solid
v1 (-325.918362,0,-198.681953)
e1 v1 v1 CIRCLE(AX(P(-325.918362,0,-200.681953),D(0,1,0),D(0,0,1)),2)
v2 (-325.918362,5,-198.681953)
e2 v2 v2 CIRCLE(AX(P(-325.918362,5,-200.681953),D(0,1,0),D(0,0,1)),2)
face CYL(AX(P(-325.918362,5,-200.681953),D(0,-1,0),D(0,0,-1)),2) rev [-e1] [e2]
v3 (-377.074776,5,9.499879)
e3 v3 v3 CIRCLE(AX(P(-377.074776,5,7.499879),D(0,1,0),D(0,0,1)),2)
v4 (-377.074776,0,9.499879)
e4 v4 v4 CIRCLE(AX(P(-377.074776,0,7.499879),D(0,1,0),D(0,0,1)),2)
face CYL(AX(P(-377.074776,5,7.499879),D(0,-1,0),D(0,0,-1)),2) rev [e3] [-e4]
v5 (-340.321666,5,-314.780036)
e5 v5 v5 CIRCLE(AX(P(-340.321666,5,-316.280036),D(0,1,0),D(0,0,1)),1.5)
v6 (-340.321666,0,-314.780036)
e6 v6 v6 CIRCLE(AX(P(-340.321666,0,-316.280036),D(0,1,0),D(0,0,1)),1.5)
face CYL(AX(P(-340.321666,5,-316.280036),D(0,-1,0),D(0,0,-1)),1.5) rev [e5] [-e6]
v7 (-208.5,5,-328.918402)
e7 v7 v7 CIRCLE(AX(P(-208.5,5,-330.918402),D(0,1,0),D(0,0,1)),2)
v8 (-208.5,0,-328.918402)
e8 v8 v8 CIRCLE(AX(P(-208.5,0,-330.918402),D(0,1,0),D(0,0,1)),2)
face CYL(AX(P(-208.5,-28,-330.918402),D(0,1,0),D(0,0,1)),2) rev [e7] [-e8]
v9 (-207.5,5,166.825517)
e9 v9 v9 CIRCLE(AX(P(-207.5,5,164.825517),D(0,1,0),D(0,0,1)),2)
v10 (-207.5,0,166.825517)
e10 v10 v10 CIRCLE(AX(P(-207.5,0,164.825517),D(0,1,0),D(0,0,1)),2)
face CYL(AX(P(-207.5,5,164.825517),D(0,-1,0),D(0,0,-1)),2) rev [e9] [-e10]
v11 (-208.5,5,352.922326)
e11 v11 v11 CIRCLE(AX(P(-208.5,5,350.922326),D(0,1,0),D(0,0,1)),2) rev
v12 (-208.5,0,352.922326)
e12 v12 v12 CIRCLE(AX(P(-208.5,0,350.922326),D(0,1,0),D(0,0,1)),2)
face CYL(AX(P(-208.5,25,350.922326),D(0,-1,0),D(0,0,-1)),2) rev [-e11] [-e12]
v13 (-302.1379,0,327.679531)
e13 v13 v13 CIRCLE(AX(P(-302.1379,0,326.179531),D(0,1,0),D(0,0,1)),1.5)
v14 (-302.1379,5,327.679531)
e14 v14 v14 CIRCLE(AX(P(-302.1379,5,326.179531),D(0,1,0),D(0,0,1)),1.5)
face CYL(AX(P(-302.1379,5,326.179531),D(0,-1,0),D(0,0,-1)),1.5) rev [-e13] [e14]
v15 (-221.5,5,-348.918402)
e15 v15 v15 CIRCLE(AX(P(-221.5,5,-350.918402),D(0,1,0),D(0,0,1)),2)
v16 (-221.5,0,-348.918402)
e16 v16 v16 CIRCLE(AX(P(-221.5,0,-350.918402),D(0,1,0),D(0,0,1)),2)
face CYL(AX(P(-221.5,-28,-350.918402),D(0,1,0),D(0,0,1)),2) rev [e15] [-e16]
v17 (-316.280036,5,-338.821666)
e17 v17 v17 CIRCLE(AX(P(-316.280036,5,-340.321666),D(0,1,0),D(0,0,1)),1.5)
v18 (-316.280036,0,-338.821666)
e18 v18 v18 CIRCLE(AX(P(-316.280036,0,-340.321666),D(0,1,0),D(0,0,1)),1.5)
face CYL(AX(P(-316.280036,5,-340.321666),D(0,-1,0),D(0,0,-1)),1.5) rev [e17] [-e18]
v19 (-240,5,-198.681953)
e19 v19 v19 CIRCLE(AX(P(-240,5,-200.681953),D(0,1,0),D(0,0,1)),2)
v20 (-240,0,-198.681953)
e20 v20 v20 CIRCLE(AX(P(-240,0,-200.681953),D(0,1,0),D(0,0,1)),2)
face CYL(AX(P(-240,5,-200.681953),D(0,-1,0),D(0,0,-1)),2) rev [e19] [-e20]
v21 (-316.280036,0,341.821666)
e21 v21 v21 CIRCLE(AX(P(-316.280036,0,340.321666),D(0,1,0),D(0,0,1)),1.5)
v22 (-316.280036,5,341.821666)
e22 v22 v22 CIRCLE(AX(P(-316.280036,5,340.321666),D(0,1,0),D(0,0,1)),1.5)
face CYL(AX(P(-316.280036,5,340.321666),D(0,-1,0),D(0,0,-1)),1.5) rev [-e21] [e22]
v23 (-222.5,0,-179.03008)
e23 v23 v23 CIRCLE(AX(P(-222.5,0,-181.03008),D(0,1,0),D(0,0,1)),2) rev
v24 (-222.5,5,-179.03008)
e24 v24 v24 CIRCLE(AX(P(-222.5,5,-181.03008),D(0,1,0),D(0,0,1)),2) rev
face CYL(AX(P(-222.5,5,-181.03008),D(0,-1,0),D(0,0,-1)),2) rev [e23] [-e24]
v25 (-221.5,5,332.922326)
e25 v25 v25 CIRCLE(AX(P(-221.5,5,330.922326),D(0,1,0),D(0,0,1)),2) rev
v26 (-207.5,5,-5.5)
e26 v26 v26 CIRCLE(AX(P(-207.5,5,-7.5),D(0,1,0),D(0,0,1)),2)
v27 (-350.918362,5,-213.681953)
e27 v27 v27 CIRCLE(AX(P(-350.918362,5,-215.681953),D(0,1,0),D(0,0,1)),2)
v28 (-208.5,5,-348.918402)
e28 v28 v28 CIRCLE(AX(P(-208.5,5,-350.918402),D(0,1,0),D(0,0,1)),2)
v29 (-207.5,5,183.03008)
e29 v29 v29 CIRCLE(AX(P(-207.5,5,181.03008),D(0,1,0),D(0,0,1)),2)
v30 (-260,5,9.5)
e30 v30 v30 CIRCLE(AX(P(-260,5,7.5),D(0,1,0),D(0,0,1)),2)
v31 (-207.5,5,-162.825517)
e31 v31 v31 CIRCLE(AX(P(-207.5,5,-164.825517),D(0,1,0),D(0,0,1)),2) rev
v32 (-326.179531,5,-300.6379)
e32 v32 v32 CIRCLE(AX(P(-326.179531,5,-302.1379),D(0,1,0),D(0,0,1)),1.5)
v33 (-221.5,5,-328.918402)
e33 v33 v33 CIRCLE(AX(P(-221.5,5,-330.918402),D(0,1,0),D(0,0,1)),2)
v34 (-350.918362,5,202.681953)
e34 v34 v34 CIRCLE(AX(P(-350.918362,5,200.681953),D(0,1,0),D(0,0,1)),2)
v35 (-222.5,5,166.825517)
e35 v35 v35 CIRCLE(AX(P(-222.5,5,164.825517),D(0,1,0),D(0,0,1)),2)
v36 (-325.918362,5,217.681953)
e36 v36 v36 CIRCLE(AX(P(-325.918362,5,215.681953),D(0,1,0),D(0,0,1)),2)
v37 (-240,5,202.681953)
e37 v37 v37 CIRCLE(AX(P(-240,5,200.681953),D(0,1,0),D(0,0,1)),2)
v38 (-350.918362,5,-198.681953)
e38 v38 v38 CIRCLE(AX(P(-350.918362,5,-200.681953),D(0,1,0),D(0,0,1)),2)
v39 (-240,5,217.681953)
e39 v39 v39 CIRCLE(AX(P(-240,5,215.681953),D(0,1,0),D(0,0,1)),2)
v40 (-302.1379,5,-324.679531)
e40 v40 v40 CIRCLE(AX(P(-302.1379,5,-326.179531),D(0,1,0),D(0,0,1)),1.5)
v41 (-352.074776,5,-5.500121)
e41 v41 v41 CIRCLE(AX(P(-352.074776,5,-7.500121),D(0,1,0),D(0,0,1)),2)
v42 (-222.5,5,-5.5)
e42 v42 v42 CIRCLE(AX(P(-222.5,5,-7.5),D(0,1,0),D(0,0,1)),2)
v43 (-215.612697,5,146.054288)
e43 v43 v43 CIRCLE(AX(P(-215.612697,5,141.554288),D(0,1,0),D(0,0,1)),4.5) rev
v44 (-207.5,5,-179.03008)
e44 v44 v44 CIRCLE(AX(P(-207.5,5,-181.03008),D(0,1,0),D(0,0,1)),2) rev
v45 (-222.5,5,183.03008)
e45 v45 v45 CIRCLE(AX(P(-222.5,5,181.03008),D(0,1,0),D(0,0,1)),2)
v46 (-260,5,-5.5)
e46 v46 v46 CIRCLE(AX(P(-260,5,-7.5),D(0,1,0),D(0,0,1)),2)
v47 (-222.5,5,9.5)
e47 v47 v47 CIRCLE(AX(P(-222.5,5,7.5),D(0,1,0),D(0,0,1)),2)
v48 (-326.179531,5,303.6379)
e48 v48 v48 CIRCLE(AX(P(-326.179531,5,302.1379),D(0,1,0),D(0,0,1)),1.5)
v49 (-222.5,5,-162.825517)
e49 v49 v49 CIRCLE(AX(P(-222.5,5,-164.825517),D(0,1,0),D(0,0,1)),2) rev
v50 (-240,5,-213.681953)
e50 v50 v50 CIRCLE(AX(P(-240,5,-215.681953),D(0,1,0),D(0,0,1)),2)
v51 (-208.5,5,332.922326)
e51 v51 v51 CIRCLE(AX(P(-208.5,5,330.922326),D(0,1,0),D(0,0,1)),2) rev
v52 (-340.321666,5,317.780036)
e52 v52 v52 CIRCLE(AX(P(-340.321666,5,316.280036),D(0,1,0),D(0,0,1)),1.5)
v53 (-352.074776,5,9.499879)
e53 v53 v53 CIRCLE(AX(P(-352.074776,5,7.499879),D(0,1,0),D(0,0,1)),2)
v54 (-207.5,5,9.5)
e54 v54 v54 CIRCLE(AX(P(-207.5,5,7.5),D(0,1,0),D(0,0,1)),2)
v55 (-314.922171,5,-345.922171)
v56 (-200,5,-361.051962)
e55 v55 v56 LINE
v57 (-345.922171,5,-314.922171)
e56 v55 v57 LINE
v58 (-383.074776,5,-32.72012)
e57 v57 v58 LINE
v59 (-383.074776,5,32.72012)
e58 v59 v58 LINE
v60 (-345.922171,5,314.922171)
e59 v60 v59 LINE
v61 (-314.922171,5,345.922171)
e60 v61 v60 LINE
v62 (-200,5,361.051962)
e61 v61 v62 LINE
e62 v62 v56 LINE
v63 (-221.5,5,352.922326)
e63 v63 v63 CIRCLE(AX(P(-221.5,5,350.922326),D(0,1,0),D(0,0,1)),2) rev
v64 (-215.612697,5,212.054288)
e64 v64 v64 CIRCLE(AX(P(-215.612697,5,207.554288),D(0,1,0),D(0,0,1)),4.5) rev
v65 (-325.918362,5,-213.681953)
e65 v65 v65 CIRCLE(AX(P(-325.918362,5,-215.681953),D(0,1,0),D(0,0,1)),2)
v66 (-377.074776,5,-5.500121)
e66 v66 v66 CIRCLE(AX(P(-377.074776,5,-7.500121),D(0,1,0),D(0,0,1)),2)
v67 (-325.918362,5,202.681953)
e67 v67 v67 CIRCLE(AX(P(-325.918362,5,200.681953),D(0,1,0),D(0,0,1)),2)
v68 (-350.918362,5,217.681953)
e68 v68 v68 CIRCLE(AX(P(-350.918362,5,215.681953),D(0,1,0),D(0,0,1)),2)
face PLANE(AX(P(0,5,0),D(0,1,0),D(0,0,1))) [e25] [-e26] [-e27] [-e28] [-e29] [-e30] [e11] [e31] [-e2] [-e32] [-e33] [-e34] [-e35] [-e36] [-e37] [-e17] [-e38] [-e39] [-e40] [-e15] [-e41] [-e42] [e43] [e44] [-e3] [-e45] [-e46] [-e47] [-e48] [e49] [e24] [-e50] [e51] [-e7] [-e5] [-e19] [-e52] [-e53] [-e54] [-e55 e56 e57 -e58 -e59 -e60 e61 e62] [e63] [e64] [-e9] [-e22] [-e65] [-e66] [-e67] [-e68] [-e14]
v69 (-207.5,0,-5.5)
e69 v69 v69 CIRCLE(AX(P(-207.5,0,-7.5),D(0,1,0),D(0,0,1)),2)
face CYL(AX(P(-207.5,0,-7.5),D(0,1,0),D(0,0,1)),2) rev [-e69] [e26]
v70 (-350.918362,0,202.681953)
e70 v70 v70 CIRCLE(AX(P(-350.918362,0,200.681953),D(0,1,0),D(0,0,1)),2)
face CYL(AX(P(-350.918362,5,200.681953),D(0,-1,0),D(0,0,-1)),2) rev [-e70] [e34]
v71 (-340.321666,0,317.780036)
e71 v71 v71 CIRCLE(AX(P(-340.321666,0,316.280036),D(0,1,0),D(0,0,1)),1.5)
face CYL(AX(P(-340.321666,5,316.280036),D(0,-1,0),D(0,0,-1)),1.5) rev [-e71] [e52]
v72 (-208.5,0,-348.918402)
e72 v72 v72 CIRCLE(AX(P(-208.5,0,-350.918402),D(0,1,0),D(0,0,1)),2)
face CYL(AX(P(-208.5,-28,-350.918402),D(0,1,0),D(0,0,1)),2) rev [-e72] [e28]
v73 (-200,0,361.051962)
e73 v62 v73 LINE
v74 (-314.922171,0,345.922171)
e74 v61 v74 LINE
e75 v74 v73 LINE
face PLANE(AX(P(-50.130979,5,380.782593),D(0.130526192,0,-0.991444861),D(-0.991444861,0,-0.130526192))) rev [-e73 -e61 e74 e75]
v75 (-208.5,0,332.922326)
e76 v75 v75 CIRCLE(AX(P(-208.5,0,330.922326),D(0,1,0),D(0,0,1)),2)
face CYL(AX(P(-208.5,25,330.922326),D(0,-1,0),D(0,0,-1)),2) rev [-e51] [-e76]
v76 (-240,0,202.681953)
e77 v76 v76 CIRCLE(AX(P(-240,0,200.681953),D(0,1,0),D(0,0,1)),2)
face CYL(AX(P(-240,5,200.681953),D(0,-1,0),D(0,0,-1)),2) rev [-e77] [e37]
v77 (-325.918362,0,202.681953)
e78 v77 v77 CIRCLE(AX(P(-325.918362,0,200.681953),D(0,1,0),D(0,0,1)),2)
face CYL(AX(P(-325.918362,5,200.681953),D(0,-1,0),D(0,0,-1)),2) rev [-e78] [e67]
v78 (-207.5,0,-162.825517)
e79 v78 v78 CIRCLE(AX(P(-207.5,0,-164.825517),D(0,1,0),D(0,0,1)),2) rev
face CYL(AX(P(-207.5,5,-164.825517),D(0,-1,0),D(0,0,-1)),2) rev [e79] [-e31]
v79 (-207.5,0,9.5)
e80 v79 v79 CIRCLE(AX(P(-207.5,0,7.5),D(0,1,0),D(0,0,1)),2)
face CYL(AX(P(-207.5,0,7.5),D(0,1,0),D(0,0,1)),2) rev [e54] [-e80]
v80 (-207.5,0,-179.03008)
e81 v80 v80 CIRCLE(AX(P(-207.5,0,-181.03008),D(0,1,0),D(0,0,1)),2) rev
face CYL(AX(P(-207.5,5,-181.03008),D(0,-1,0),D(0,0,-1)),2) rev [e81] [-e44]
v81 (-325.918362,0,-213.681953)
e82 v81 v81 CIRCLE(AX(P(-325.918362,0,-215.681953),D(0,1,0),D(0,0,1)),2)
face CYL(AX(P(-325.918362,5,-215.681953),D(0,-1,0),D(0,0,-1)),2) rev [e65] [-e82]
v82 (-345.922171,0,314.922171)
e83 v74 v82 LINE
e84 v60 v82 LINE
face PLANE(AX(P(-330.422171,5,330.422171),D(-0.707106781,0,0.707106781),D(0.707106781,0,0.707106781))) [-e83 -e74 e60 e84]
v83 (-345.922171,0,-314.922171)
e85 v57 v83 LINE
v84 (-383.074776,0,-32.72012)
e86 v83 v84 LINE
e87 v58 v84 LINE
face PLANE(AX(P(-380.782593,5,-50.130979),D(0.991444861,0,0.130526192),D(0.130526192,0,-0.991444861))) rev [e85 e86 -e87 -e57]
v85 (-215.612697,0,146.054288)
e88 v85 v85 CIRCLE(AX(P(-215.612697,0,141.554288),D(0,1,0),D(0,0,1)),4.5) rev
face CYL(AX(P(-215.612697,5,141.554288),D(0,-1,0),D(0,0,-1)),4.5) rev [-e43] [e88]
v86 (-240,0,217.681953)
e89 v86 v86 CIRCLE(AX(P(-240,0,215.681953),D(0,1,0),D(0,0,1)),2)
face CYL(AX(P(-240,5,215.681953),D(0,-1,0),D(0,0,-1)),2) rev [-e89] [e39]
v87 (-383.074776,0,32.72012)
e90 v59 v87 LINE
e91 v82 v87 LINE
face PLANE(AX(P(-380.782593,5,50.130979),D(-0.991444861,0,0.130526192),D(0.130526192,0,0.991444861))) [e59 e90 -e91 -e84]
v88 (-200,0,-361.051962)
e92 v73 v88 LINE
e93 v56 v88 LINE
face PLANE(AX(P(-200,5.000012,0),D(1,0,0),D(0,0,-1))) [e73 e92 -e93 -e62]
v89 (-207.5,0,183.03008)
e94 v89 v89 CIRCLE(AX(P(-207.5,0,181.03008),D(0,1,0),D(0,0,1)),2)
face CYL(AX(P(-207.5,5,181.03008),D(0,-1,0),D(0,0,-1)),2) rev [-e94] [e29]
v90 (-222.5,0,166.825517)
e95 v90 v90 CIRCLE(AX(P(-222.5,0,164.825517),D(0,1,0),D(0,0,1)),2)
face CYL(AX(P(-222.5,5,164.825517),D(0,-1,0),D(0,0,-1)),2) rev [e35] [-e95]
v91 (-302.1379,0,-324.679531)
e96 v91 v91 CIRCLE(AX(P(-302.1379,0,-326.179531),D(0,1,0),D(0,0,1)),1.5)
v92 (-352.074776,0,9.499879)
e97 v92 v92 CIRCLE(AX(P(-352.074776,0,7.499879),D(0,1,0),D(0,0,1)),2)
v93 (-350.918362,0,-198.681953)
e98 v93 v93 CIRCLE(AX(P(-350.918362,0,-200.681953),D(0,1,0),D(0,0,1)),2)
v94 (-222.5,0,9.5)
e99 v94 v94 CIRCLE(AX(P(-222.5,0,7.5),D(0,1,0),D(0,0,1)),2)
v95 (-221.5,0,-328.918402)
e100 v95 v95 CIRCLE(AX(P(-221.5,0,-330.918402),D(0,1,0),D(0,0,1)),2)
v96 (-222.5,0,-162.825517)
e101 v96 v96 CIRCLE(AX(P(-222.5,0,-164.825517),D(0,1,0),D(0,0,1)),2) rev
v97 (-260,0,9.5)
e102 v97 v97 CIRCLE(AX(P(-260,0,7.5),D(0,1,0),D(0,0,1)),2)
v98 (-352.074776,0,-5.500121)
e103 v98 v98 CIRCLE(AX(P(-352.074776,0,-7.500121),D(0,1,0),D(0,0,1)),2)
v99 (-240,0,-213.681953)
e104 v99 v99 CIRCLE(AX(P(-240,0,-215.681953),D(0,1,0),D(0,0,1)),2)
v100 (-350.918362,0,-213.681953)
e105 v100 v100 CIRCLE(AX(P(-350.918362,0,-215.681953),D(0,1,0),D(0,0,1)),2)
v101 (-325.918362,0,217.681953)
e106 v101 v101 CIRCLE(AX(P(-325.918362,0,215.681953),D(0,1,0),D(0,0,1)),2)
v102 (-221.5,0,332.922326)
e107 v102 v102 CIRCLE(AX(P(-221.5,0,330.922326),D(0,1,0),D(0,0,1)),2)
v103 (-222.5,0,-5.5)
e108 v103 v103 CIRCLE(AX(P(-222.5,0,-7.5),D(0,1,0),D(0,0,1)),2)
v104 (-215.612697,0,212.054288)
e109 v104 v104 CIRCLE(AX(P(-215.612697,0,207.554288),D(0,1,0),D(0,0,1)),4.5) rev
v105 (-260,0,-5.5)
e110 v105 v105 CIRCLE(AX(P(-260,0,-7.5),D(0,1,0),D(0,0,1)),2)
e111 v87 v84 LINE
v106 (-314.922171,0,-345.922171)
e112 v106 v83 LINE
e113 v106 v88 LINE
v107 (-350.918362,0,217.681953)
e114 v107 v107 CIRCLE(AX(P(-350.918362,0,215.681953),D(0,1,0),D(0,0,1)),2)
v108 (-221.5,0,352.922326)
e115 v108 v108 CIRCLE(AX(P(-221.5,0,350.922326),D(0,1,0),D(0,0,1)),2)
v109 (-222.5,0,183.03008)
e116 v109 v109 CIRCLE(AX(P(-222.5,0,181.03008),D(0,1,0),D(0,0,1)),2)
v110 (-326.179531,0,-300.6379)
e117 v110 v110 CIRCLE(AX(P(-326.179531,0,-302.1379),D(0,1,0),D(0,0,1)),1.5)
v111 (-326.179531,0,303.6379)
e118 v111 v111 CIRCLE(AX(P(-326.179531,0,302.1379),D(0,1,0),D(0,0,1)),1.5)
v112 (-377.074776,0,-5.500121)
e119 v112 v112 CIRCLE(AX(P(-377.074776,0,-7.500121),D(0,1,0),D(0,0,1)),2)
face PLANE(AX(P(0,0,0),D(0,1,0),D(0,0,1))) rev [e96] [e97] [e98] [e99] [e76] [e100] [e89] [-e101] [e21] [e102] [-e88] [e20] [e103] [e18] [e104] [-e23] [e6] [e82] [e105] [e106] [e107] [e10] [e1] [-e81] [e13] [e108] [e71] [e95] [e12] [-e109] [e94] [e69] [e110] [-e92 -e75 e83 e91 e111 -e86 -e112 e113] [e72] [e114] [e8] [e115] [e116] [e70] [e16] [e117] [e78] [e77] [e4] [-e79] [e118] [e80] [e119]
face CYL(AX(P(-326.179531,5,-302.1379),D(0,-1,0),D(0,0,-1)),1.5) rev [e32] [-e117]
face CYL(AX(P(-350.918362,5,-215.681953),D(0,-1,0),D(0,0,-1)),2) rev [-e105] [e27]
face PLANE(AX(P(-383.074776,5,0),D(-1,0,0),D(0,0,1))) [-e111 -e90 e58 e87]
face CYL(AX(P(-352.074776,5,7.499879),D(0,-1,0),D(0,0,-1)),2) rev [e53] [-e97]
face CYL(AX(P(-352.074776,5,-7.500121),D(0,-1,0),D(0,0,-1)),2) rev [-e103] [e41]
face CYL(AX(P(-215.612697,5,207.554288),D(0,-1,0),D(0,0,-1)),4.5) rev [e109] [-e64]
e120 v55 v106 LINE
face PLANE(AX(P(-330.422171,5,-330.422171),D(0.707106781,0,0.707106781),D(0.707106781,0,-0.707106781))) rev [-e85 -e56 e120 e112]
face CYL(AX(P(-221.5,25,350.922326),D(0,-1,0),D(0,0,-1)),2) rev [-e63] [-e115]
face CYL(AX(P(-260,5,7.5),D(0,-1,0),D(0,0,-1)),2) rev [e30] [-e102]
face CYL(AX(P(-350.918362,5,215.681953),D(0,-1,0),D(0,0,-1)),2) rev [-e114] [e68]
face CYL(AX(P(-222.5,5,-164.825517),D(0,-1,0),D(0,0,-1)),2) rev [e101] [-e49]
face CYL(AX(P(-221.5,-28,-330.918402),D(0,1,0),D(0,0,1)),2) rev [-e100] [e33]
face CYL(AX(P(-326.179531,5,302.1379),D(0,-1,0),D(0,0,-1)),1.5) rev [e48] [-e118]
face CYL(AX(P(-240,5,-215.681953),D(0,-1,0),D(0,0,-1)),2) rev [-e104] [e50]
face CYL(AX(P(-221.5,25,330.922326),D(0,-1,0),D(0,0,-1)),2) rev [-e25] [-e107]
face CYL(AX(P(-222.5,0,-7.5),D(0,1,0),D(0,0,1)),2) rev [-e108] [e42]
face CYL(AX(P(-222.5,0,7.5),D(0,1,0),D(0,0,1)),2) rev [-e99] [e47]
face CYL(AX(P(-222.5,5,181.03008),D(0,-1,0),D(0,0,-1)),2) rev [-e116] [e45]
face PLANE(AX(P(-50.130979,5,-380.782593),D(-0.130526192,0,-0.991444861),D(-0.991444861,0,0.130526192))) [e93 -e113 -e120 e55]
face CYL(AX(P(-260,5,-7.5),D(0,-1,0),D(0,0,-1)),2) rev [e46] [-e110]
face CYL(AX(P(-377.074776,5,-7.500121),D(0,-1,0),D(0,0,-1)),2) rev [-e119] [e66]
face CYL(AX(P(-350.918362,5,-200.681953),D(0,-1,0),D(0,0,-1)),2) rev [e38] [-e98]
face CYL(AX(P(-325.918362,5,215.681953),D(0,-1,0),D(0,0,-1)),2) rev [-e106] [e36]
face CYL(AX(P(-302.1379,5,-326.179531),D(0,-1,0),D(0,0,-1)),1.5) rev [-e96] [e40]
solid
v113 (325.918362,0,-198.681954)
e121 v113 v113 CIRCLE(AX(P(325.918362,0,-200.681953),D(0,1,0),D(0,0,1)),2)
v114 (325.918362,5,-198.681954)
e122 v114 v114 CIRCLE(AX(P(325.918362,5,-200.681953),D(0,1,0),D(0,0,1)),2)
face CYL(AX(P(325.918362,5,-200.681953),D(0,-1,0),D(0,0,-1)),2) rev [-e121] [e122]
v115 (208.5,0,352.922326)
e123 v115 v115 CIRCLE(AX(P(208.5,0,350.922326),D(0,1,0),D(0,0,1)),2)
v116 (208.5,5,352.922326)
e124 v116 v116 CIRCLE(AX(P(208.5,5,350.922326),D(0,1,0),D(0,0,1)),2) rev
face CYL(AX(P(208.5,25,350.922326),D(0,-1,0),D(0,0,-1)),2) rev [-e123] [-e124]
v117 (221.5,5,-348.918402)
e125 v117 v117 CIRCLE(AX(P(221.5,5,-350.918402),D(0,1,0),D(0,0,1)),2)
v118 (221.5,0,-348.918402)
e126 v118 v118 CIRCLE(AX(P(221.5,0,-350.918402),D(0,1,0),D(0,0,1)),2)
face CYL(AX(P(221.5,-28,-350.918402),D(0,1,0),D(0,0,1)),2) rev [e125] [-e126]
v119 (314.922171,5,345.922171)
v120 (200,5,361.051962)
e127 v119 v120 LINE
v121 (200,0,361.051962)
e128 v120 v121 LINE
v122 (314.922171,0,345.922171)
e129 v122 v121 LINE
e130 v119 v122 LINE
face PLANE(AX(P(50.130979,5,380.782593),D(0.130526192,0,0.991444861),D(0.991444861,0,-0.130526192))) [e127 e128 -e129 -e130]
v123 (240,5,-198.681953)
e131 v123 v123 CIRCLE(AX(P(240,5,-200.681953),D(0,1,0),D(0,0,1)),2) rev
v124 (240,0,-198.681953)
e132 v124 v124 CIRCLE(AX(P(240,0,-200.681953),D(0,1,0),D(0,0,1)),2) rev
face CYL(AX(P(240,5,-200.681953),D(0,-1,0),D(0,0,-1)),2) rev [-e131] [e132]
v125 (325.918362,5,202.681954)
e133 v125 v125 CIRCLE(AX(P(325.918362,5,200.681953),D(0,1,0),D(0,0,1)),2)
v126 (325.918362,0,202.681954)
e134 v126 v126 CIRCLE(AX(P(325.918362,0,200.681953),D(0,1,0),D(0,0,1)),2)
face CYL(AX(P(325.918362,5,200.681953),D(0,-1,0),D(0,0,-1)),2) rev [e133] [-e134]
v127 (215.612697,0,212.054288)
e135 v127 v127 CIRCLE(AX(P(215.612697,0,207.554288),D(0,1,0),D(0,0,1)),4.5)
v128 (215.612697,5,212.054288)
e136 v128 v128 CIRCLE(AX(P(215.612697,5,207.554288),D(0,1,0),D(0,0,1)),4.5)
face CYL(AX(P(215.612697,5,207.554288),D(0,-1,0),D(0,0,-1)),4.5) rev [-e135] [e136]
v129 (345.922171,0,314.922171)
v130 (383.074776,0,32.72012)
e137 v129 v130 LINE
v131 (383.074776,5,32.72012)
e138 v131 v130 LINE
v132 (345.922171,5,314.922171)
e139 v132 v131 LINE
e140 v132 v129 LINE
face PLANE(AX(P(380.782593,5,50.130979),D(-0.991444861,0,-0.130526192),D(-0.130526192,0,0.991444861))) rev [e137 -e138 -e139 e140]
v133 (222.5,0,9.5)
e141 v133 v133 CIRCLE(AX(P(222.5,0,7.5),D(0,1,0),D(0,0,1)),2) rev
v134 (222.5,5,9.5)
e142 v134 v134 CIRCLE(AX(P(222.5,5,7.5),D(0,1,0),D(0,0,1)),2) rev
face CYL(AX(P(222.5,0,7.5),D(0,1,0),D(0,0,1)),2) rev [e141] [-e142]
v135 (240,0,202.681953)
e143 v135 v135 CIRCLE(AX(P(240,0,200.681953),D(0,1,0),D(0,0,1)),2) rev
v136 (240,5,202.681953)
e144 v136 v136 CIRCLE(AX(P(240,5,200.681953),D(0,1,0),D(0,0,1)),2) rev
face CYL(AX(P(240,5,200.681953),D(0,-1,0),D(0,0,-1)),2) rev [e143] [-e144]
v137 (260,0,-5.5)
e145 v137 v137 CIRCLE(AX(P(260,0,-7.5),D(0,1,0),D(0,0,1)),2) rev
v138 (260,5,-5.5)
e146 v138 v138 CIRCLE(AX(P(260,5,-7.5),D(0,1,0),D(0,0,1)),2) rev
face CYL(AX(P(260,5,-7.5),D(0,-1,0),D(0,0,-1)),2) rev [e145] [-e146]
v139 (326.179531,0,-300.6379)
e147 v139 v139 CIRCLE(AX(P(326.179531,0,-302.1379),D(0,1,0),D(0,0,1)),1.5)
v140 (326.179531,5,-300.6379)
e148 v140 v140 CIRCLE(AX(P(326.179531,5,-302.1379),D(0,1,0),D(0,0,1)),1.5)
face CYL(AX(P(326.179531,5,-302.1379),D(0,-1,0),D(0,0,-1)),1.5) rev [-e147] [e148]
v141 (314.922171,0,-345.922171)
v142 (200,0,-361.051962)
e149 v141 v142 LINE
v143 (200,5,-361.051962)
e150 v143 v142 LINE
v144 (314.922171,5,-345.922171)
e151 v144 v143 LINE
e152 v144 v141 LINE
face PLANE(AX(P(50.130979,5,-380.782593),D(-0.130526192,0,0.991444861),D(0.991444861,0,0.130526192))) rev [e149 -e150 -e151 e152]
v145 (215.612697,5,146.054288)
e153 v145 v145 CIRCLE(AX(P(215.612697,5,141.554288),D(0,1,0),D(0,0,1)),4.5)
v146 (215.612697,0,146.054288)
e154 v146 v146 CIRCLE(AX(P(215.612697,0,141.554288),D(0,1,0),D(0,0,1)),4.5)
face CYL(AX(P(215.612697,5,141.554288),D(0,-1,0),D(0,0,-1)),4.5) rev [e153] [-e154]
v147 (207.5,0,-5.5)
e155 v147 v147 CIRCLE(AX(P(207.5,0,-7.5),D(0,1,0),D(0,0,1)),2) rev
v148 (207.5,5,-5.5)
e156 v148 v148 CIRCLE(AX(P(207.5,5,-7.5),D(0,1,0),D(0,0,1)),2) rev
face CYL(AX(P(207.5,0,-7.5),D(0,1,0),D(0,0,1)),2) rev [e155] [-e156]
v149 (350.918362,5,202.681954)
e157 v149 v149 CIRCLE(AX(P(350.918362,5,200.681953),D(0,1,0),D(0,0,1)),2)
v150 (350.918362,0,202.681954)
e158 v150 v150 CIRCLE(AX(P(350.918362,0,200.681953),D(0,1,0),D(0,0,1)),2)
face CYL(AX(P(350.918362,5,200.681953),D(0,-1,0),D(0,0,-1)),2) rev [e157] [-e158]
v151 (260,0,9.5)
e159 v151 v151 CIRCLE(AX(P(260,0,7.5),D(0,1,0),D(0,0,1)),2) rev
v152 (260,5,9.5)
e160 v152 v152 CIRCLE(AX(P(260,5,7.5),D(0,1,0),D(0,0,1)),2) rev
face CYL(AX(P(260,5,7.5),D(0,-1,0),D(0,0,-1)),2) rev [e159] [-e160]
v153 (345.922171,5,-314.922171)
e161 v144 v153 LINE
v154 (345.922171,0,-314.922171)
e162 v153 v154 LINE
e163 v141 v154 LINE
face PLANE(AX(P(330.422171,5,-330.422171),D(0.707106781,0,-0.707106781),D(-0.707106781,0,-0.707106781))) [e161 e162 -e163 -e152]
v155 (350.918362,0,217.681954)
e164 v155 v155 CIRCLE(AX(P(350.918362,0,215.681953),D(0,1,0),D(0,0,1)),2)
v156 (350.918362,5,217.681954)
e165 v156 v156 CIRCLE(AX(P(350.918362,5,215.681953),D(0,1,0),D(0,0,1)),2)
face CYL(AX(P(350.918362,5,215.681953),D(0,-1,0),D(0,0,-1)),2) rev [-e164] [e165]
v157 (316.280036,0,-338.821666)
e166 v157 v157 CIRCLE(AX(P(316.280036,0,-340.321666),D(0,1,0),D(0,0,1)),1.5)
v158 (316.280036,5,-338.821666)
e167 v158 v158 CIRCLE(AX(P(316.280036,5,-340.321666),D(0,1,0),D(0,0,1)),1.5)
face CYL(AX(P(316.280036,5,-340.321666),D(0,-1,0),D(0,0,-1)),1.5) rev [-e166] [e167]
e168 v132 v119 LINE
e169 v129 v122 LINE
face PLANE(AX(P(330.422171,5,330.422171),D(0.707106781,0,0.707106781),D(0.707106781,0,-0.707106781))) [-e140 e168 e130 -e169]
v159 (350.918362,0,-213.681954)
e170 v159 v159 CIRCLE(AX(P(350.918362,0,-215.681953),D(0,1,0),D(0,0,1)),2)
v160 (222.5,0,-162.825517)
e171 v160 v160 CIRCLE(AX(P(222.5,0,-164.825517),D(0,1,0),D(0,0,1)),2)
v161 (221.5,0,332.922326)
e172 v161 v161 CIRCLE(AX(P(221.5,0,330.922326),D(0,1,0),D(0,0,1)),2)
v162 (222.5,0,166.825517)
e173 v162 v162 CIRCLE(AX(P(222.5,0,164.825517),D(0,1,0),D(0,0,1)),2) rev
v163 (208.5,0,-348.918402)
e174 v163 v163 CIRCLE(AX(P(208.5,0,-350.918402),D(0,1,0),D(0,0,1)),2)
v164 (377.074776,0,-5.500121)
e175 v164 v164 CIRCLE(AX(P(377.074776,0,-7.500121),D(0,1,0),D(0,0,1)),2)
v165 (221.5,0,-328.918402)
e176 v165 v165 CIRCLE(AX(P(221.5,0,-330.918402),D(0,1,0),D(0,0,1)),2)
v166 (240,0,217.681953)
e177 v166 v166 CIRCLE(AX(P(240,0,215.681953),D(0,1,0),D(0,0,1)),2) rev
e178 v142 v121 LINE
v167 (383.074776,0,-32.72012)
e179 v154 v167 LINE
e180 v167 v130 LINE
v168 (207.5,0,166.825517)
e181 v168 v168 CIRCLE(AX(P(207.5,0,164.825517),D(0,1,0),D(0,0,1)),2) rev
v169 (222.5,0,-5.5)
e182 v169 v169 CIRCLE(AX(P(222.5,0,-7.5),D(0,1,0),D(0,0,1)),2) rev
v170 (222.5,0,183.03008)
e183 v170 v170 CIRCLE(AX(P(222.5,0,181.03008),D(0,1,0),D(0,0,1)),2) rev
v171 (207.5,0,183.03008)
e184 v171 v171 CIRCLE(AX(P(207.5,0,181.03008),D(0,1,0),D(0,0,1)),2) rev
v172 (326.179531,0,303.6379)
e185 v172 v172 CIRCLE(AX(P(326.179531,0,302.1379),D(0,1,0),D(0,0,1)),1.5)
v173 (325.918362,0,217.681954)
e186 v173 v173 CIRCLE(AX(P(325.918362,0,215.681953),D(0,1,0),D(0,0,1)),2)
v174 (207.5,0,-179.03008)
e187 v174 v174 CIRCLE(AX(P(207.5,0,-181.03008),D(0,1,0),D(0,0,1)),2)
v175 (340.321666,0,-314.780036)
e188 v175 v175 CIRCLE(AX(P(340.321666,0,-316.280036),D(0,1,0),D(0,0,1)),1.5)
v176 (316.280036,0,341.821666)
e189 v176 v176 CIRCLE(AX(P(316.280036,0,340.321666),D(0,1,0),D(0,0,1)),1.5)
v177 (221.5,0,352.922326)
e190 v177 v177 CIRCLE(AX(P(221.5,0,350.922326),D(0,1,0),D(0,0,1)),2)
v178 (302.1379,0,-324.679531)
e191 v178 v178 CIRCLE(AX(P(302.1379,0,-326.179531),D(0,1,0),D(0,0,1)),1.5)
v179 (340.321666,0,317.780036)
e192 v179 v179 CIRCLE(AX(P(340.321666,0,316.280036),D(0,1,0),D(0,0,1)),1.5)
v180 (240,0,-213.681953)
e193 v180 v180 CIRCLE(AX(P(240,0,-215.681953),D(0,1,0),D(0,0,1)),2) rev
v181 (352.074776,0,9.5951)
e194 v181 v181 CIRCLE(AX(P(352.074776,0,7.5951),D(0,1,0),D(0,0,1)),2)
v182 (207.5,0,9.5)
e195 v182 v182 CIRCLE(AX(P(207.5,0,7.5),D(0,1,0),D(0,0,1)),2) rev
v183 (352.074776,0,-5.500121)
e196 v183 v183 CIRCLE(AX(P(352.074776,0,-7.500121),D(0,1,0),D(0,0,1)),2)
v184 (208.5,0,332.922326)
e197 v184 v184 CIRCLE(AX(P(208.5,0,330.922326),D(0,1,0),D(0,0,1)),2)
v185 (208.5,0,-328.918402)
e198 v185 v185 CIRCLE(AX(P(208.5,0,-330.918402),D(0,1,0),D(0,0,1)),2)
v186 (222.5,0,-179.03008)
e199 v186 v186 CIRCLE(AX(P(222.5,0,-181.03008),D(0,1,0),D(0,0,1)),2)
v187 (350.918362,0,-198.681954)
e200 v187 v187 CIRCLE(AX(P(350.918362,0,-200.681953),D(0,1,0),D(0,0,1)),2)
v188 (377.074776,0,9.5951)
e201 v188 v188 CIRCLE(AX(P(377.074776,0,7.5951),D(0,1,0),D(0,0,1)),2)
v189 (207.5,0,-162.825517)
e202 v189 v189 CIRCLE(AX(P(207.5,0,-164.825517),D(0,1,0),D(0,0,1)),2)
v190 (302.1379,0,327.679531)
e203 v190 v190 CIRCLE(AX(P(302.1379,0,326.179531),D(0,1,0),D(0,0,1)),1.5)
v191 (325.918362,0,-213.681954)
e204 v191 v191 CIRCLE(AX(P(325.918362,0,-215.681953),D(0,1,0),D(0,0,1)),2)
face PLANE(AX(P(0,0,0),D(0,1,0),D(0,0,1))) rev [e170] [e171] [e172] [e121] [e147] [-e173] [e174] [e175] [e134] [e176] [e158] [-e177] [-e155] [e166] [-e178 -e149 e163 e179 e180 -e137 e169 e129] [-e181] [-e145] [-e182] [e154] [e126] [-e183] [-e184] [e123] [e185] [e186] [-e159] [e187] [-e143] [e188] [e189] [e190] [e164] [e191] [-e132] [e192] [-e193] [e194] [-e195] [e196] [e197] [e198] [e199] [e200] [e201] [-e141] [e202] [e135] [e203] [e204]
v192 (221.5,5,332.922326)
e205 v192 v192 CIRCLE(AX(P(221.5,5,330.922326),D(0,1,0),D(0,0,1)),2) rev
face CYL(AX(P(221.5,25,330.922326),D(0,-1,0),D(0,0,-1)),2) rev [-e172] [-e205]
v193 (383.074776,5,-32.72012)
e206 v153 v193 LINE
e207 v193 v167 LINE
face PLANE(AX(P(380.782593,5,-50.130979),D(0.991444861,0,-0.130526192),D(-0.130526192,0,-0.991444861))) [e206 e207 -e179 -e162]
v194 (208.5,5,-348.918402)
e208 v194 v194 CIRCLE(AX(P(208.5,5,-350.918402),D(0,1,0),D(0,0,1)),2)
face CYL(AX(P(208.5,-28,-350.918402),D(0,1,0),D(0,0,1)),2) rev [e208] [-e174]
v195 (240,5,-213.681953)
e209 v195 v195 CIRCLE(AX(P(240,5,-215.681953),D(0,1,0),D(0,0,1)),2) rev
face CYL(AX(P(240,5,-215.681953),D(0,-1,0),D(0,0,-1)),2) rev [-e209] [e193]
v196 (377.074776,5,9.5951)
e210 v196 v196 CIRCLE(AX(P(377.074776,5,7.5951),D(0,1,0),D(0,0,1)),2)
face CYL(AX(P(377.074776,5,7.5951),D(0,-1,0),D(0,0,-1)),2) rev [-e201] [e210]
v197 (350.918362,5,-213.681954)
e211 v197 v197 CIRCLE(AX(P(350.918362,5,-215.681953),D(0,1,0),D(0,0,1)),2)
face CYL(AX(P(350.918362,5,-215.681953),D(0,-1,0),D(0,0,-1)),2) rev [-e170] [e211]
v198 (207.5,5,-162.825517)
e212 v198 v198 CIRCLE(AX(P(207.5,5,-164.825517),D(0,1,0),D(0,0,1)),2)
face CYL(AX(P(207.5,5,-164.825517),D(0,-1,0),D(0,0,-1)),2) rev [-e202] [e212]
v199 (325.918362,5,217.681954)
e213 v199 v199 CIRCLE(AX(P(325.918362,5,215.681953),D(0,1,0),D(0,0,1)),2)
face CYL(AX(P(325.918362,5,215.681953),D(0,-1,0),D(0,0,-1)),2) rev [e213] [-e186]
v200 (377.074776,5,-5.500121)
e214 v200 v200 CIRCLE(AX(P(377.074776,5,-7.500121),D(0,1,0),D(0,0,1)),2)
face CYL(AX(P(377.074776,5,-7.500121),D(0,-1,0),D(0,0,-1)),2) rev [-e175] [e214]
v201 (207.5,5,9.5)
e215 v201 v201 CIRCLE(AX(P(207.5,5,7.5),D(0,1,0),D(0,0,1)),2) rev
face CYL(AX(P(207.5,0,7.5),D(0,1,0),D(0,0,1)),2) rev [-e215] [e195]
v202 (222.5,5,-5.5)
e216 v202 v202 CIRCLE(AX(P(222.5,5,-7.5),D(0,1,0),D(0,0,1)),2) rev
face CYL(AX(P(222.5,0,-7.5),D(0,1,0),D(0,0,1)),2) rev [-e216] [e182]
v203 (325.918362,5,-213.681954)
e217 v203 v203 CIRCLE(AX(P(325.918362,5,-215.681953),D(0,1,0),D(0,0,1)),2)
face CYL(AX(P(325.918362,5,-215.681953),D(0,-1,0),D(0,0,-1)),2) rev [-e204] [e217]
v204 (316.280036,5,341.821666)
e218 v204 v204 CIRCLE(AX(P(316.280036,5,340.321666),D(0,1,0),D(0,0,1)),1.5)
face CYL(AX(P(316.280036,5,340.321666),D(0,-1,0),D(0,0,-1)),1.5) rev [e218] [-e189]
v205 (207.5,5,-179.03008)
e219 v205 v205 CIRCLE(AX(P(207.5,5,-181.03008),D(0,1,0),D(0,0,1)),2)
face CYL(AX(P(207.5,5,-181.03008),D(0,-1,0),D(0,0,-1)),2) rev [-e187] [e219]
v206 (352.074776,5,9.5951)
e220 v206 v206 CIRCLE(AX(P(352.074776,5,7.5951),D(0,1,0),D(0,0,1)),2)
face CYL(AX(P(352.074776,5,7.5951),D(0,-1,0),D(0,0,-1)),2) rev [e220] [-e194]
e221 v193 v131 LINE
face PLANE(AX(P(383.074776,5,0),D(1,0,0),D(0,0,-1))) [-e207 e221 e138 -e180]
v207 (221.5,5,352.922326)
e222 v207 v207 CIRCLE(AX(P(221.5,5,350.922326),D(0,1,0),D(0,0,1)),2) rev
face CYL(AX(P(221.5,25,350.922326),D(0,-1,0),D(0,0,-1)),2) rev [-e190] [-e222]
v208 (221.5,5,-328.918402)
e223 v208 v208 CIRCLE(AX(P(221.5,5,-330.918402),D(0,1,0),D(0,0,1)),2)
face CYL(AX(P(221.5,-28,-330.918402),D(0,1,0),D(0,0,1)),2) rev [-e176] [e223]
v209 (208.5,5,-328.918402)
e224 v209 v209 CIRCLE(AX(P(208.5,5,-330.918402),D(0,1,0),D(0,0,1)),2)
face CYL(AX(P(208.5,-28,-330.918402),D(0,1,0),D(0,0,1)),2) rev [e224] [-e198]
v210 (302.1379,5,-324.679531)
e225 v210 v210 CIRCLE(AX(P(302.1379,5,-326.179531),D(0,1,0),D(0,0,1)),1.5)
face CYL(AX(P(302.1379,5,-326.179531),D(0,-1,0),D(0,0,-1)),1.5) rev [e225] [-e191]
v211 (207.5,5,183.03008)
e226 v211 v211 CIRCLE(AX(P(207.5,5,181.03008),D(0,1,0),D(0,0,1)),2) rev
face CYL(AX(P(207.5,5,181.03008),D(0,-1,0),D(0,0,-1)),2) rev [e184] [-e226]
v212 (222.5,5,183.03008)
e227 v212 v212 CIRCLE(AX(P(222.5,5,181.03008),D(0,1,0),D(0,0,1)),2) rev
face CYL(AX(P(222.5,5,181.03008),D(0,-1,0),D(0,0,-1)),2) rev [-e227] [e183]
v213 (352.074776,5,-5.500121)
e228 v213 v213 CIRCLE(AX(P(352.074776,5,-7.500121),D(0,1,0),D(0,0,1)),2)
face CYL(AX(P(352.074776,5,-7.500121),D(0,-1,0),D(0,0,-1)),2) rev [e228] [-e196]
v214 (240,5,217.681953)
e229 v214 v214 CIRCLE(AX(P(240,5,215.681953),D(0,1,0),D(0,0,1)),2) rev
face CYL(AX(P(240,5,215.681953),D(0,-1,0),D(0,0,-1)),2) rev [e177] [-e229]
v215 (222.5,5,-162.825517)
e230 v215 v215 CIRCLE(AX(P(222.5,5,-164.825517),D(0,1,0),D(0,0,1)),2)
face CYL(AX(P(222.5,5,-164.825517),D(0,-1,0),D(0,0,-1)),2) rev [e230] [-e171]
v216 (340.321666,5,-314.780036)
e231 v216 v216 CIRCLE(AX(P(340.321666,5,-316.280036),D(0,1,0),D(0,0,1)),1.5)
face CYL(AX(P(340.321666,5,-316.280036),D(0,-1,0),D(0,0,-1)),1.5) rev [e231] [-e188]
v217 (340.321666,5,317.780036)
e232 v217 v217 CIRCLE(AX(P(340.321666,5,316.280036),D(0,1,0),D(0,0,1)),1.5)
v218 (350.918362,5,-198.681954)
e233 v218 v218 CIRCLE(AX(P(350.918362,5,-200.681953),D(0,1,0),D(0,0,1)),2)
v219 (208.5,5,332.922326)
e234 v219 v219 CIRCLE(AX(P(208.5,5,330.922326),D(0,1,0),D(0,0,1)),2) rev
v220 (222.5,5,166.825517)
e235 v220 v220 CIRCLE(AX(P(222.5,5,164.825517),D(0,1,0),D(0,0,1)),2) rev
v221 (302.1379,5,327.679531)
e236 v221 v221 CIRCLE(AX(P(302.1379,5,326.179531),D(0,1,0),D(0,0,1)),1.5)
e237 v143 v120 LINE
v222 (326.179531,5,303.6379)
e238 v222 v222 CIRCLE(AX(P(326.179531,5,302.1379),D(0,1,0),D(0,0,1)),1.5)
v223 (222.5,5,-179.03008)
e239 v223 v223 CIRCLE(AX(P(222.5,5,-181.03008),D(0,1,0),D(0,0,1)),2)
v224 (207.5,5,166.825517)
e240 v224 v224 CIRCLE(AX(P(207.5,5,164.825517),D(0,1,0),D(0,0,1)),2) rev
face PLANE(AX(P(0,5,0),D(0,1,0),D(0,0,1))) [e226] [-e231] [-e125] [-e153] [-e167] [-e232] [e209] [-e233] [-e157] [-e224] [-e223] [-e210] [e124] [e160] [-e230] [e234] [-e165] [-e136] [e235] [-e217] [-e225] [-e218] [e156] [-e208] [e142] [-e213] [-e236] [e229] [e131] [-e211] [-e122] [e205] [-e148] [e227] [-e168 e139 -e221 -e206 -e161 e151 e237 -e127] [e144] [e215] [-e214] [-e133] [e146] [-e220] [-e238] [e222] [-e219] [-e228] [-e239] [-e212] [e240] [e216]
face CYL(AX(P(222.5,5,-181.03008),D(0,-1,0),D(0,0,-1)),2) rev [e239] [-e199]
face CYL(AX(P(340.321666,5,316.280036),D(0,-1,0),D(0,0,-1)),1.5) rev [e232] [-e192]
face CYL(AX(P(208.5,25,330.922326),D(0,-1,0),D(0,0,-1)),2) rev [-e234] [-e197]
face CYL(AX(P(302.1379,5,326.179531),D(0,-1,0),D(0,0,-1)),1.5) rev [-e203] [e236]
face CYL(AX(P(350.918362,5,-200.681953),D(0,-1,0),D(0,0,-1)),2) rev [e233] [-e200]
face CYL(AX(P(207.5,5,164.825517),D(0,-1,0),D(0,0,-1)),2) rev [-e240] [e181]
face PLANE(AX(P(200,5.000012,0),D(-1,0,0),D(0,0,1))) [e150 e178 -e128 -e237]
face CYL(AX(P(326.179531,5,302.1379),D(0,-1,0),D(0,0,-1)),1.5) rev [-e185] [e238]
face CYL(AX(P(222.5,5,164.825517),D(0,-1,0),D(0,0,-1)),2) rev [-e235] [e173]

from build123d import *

# Parameters (mm, degrees)
SKETCH_1_R               = 1.5
SKETCH_1_R_2             = 1.999999999
SKETCH_1_R_3             = 2
SKETCH_1_R_4             = 4.5
SKETCH_1_R_5             = 2.000000001
SKETCH_1_R_6             = 2.000000002
SKETCH_1_R_7             = 2.000000003
SKETCH_1_R_8             = 250
SKETCH_1_R_9             = 1.999999988
EXTRUDE_2_DEPTH          = 5
CUT_EXTRUDE_1_DEPTH      = 542.772616539
CUT_EXTRUDE_1_DEPTH_BACK = 122
CUT_EXTRUDE_2_DEPTH      = 527.431195247
CUT_EXTRUDE_2_DEPTH_BACK = 39
SKETCH_3_R               = 2
CUT_EXTRUDE_3_DEPTH      = 20
CUT_EXTRUDE_3_DEPTH_BACK = 527.431195247
SKETCH_4_R               = 2
SKETCH_5_R               = 2.000000001
SKETCH_5_R_2             = 1.999999999
EXTRUDE_3_DEPTH          = 5
SKETCH_6_R               = 2
SKETCH_6_R_2             = 2.000000001
CUT_EXTRUDE_5_DEPTH      = 33


with BuildPart() as part:
    # 草图1 → 凸台-拉伸2 (new body)
    with BuildSketch(Plane(origin=(0, 0, 0), x_dir=(1, 0, 0), z_dir=(0, 1, 0))):
        Polygon((-32.720120418, 383.074776011), (-314.922171201, 345.922171201), (-345.922171201, 314.922171201), (-383.074776011, 32.720120418), (-383.074776011, -32.720120418), (-345.922171201, -314.922171201), (-314.922171201, -345.922171201), (-32.720120418, -383.074776011), (32.720120418, -383.074776011), (314.922171201, -345.922171201), (345.922171201, -314.922171201), (383.074776011, -32.720120418), (383.074776011, 32.720120418), (345.922171201, 314.922171201), (314.922171201, 345.922171201), (32.720120418, 383.074776011), (0, 383.074776011), align=None)
        with Locations((-316.280035574, -340.321666135)):
            Circle(SKETCH_1_R, mode=Mode.SUBTRACT)
        with Locations((-340.321666134, -316.280035574)):
            Circle(SKETCH_1_R, mode=Mode.SUBTRACT)
        with Locations((-302.137899951, -326.179530511)):
            Circle(SKETCH_1_R, mode=Mode.SUBTRACT)
        with Locations((-326.179530511, -302.137899951)):
            Circle(SKETCH_1_R, mode=Mode.SUBTRACT)
        with Locations((-350.918362049, -215.681953419)):
            Circle(SKETCH_1_R_2, mode=Mode.SUBTRACT)
        with Locations((-350.918362049, -200.681953419)):
            Circle(SKETCH_1_R_2, mode=Mode.SUBTRACT)
        with Locations((-325.918362049, -215.681953419)):
            Circle(SKETCH_1_R_2, mode=Mode.SUBTRACT)
        with Locations((-325.918362049, -200.681953419)):
            Circle(SKETCH_1_R_2, mode=Mode.SUBTRACT)
        with Locations((-240, -215.681953429)):
            Circle(SKETCH_1_R_3, mode=Mode.SUBTRACT)
        with Locations((-240, -200.681953429)):
            Circle(SKETCH_1_R_3, mode=Mode.SUBTRACT)
        with Locations((-215.612697258, -207.55428794)):
            Circle(SKETCH_1_R_4, mode=Mode.SUBTRACT)
        with Locations((-222.5, -181.030079822)):
            Circle(SKETCH_1_R_3, mode=Mode.SUBTRACT)
        with Locations((-207.5, -181.030079822)):
            Circle(SKETCH_1_R_3, mode=Mode.SUBTRACT)
        with Locations((-222.500000001, -164.825516547)):
            Circle(SKETCH_1_R_5, mode=Mode.SUBTRACT)
        with Locations((-207.500000001, -164.825516547)):
            Circle(SKETCH_1_R_5, mode=Mode.SUBTRACT)
        with Locations((-215.612697258, -141.55428794)):
            Circle(SKETCH_1_R_4, mode=Mode.SUBTRACT)
        with Locations((-377.074776011, -7.499878938)):
            Circle(SKETCH_1_R_3, mode=Mode.SUBTRACT)
        with Locations((-352.074776011, -7.499878938)):
            Circle(SKETCH_1_R_3, mode=Mode.SUBTRACT)
        with Locations((-260, -7.5)):
            Circle(SKETCH_1_R_3, mode=Mode.SUBTRACT)
        with Locations((316.280035574, -340.321666135)):
            Circle(SKETCH_1_R, mode=Mode.SUBTRACT)
        with Locations((302.13789995, -326.179530511)):
            Circle(SKETCH_1_R, mode=Mode.SUBTRACT)
        with Locations((326.179530511, -302.137899951)):
            Circle(SKETCH_1_R, mode=Mode.SUBTRACT)
        with Locations((340.321666135, -316.280035574)):
            Circle(SKETCH_1_R, mode=Mode.SUBTRACT)
        with Locations((215.612697258, -207.55428794)):
            Circle(SKETCH_1_R_4, mode=Mode.SUBTRACT)
        with Locations((240, -215.681953429)):
            Circle(SKETCH_1_R_3, mode=Mode.SUBTRACT)
        with Locations((240, -200.681953429)):
            Circle(SKETCH_1_R_3, mode=Mode.SUBTRACT)
        with Locations((325.918362038, -215.681953499)):
            Circle(SKETCH_1_R_6, mode=Mode.SUBTRACT)
        with Locations((325.918362038, -200.681953499)):
            Circle(SKETCH_1_R_6, mode=Mode.SUBTRACT)
        with Locations((350.918362038, -215.681953499)):
            Circle(SKETCH_1_R_6, mode=Mode.SUBTRACT)
        with Locations((350.918362038, -200.681953499)):
            Circle(SKETCH_1_R_6, mode=Mode.SUBTRACT)
        with Locations((207.5, -181.030079822)):
            Circle(SKETCH_1_R_3, mode=Mode.SUBTRACT)
        with Locations((222.5, -181.030079822)):
            Circle(SKETCH_1_R_3, mode=Mode.SUBTRACT)
        with Locations((207.500000001, -164.825516547)):
            Circle(SKETCH_1_R_5, mode=Mode.SUBTRACT)
        with Locations((222.500000001, -164.825516547)):
            Circle(SKETCH_1_R_5, mode=Mode.SUBTRACT)
        with Locations((215.612697258, -141.55428794)):
            Circle(SKETCH_1_R_4, mode=Mode.SUBTRACT)
        with Locations((260, -7.5)):
            Circle(SKETCH_1_R_3, mode=Mode.SUBTRACT)
        with Locations((352.074776011, -7.595099646)):
            Circle(SKETCH_1_R_3, mode=Mode.SUBTRACT)
        with Locations((377.074776011, -7.595099646)):
            Circle(SKETCH_1_R_3, mode=Mode.SUBTRACT)
        with Locations((-377.074776011, 7.500121062)):
            Circle(SKETCH_1_R_3, mode=Mode.SUBTRACT)
        with Locations((-352.074776011, 7.500121062)):
            Circle(SKETCH_1_R_3, mode=Mode.SUBTRACT)
        with Locations((-260, 7.5)):
            Circle(SKETCH_1_R_3, mode=Mode.SUBTRACT)
        with Locations((-222.500000001, 164.825516547)):
            Circle(SKETCH_1_R_5, mode=Mode.SUBTRACT)
        with Locations((-207.500000001, 164.825516547)):
            Circle(SKETCH_1_R_5, mode=Mode.SUBTRACT)
        with Locations((-222.5, 181.030079822)):
            Circle(SKETCH_1_R_3, mode=Mode.SUBTRACT)
        with Locations((-207.5, 181.030079822)):
            Circle(SKETCH_1_R_3, mode=Mode.SUBTRACT)
        with Locations((-350.918362049, 200.681953419)):
            Circle(SKETCH_1_R_7, mode=Mode.SUBTRACT)
        with Locations((-350.918362049, 215.681953419)):
            Circle(SKETCH_1_R_7, mode=Mode.SUBTRACT)
        with Locations((-325.918362049, 200.681953419)):
            Circle(SKETCH_1_R_7, mode=Mode.SUBTRACT)
        with Locations((-325.918362049, 215.681953419)):
            Circle(SKETCH_1_R_7, mode=Mode.SUBTRACT)
        with Locations((-240, 200.681953428)):
            Circle(SKETCH_1_R_3, mode=Mode.SUBTRACT)
        with Locations((-240, 215.681953428)):
            Circle(SKETCH_1_R_3, mode=Mode.SUBTRACT)
        with Locations((-340.321666134, 316.280035574)):
            Circle(SKETCH_1_R, mode=Mode.SUBTRACT)
        with Locations((-326.179530511, 302.137899951)):
            Circle(SKETCH_1_R, mode=Mode.SUBTRACT)
        with Locations((-302.13789995, 326.179530511)):
            Circle(SKETCH_1_R, mode=Mode.SUBTRACT)
        with Locations((-316.280035574, 340.321666134)):
            Circle(SKETCH_1_R, mode=Mode.SUBTRACT)
        Circle(SKETCH_1_R_8, mode=Mode.SUBTRACT)
        with Locations((260, 7.5)):
            Circle(SKETCH_1_R_3, mode=Mode.SUBTRACT)
        with Locations((352.074776011, 7.500121062)):
            Circle(SKETCH_1_R_3, mode=Mode.SUBTRACT)
        with Locations((377.074776011, 7.500121062)):
            Circle(SKETCH_1_R_3, mode=Mode.SUBTRACT)
        with Locations((207.500000001, 164.825516547)):
            Circle(SKETCH_1_R_2, mode=Mode.SUBTRACT)
        with Locations((222.500000001, 164.825516547)):
            Circle(SKETCH_1_R_2, mode=Mode.SUBTRACT)
        with Locations((207.5, 181.030079822)):
            Circle(SKETCH_1_R_3, mode=Mode.SUBTRACT)
        with Locations((222.5, 181.030079822)):
            Circle(SKETCH_1_R_3, mode=Mode.SUBTRACT)
        with Locations((240, 200.681953428)):
            Circle(SKETCH_1_R_3, mode=Mode.SUBTRACT)
        with Locations((240, 215.681953428)):
            Circle(SKETCH_1_R_3, mode=Mode.SUBTRACT)
        with Locations((325.918362038, 200.681953498)):
            Circle(SKETCH_1_R_9, mode=Mode.SUBTRACT)
        with Locations((325.918362038, 215.681953498)):
            Circle(SKETCH_1_R_9, mode=Mode.SUBTRACT)
        with Locations((350.918362038, 200.681953498)):
            Circle(SKETCH_1_R_9, mode=Mode.SUBTRACT)
        with Locations((350.918362038, 215.681953498)):
            Circle(SKETCH_1_R_9, mode=Mode.SUBTRACT)
        with Locations((326.179530511, 302.13789995)):
            Circle(SKETCH_1_R, mode=Mode.SUBTRACT)
        with Locations((302.137899951, 326.179530511)):
            Circle(SKETCH_1_R, mode=Mode.SUBTRACT)
        with Locations((340.321666135, 316.280035574)):
            Circle(SKETCH_1_R, mode=Mode.SUBTRACT)
        with Locations((316.280035574, 340.321666134)):
            Circle(SKETCH_1_R, mode=Mode.SUBTRACT)
    extrude(amount=EXTRUDE_2_DEPTH)

    # 草图2 → 切除-拉伸1 (cut, two sides: drawn at the far end of the back side and taken through both)
    with BuildSketch(Plane(origin=(0, 5, 0), x_dir=(1, 0, 0), z_dir=(0, 1, 0)).offset(-CUT_EXTRUDE_1_DEPTH_BACK)):
        Polygon((-200, 484.714921051), (-200, 361.051962068), (-200, -361.051962068), (-200, -418.819036359), (200, -418.819036359), (200, -361.051962068), (200, 361.051962068), (200, 484.714921051), align=None)
    extrude(amount=CUT_EXTRUDE_1_DEPTH + CUT_EXTRUDE_1_DEPTH_BACK, mode=Mode.SUBTRACT)


with BuildPart() as cut_extrude_1_piece_1:
    # of the separate pieces the step leaves, piece 1, a body of its own (cut_extrude_1_pieces)
    add(part.part.solids().sort_by_distance((200, 0, 361.051962068))[0])

    # 草图4 → 切除-拉伸3 (cut, two sides: drawn at the far end of the back side and taken through both)
    with BuildSketch(Plane(origin=(0, 5, 0), x_dir=(1, 0, 0), z_dir=(0, 1, 0)).offset(-CUT_EXTRUDE_3_DEPTH_BACK)):
        with Locations((-221.500000001, -330.922325919)):
            Circle(SKETCH_4_R)
        with Locations((-208.500000001, -330.922325919)):
            Circle(SKETCH_4_R)
        with Locations((-208.500000001, -350.922325919)):
            Circle(SKETCH_4_R)
        with Locations((-221.500000001, -350.922325919)):
            Circle(SKETCH_4_R)
        with Locations((221.500000002, -350.922325919)):
            Circle(SKETCH_4_R)
        with Locations((208.500000002, -350.922325919)):
            Circle(SKETCH_4_R)
        with Locations((208.500000002, -330.922325919)):
            Circle(SKETCH_4_R)
        with Locations((221.500000002, -330.922325919)):
            Circle(SKETCH_4_R)
    extrude(amount=CUT_EXTRUDE_3_DEPTH + CUT_EXTRUDE_3_DEPTH_BACK, mode=Mode.SUBTRACT)



with BuildPart() as cut_extrude_1_piece_2:
    # of the separate pieces the step leaves, piece 2, a body of its own (cut_extrude_1_pieces)
    add(part.part.solids().sort_by_distance((-314.922171201, 0, 345.922171201))[0])

    # 草图3 → 切除-拉伸2 (cut, two sides: drawn at the far end of the back side and taken through both)
    with BuildSketch(Plane(origin=(0, 0, 0), x_dir=(-1, 0, 0), z_dir=(0, -1, 0)).offset(-CUT_EXTRUDE_2_DEPTH_BACK)):
        with Locations((208.500000001, -330.922325919)):
            Circle(SKETCH_3_R)
        with Locations((221.500000001, -330.922325919)):
            Circle(SKETCH_3_R)
        with Locations((221.500000001, -350.922325919)):
            Circle(SKETCH_3_R)
        with Locations((208.500000001, -350.922325919)):
            Circle(SKETCH_3_R)
    extrude(amount=CUT_EXTRUDE_2_DEPTH + CUT_EXTRUDE_2_DEPTH_BACK, mode=Mode.SUBTRACT)


with BuildPart() as cut_extrude_1_piece_1_1:
    add(cut_extrude_1_piece_1.part)

    add(cut_extrude_1_piece_2.part)  # 凸台-拉伸3 merges 切除-拉伸1 piece 2
    # 草图5 → 凸台-拉伸3 (add)
    # profile 1 of 2: a face of its own
    with BuildSketch(Plane(origin=(0, 5, 0), x_dir=(1, 0, 0), z_dir=(0, 1, 0))):
        with BuildLine():
            Line((-200, 7.5), (-200, 150))
            ThreePointArc((-200, 150), (-250, 0), (-200, -150))
            Line((-200, -150), (-200, -7.5))
            Line((-200.000000001, -7.5), (-200.000000001, 7.5))
        make_face()
        with Locations((-222.500000001, -7.5)):
            Circle(SKETCH_5_R, mode=Mode.SUBTRACT)
        with Locations((-207.500000001, -7.5)):
            Circle(SKETCH_5_R, mode=Mode.SUBTRACT)
        with Locations((-222.500000001, 7.5)):
            Circle(SKETCH_5_R, mode=Mode.SUBTRACT)
        with Locations((-207.500000001, 7.5)):
            Circle(SKETCH_5_R, mode=Mode.SUBTRACT)
    # profile 2 of 2: a face of its own
    with BuildSketch(Plane(origin=(0, 5, 0), x_dir=(1, 0, 0), z_dir=(0, 1, 0))):
        with BuildLine():
            ThreePointArc((200, -150), (250, 0), (200, 150))
            Line((200, 150), (200, -150))
        make_face()
        with Locations((207.500000001, -7.5)):
            Circle(SKETCH_5_R_2, mode=Mode.SUBTRACT)
        with Locations((222.500000001, -7.5)):
            Circle(SKETCH_5_R_2, mode=Mode.SUBTRACT)
        with Locations((207.500000001, 7.5)):
            Circle(SKETCH_5_R_2, mode=Mode.SUBTRACT)
        with Locations((222.500000001, 7.5)):
            Circle(SKETCH_5_R_2, mode=Mode.SUBTRACT)
    extrude(amount=-EXTRUDE_3_DEPTH)

    # 草图6 → 切除-拉伸5 (cut)
    with BuildSketch(Plane(origin=(0, 5, 0), x_dir=(1, 0, 0), z_dir=(0, 1, 0))):
        with Locations((-208.500000001, 350.918401784)):
            Circle(SKETCH_6_R)
        with Locations((-221.500000001, 350.918401784)):
            Circle(SKETCH_6_R)
        with Locations((-221.500000001, 330.918401784)):
            Circle(SKETCH_6_R)
        with Locations((-208.500000001, 330.918401784)):
            Circle(SKETCH_6_R)
        with Locations((221.499999992, 350.918401782)):
            Circle(SKETCH_6_R_2)
        with Locations((208.499999992, 350.918401782)):
            Circle(SKETCH_6_R_2)
        with Locations((208.499999992, 330.918401782)):
            Circle(SKETCH_6_R_2)
        with Locations((221.499999992, 330.918401782)):
            Circle(SKETCH_6_R_2)
    extrude(amount=-CUT_EXTRUDE_5_DEPTH, mode=Mode.SUBTRACT)


solid = cut_extrude_1_piece_1_1.part
